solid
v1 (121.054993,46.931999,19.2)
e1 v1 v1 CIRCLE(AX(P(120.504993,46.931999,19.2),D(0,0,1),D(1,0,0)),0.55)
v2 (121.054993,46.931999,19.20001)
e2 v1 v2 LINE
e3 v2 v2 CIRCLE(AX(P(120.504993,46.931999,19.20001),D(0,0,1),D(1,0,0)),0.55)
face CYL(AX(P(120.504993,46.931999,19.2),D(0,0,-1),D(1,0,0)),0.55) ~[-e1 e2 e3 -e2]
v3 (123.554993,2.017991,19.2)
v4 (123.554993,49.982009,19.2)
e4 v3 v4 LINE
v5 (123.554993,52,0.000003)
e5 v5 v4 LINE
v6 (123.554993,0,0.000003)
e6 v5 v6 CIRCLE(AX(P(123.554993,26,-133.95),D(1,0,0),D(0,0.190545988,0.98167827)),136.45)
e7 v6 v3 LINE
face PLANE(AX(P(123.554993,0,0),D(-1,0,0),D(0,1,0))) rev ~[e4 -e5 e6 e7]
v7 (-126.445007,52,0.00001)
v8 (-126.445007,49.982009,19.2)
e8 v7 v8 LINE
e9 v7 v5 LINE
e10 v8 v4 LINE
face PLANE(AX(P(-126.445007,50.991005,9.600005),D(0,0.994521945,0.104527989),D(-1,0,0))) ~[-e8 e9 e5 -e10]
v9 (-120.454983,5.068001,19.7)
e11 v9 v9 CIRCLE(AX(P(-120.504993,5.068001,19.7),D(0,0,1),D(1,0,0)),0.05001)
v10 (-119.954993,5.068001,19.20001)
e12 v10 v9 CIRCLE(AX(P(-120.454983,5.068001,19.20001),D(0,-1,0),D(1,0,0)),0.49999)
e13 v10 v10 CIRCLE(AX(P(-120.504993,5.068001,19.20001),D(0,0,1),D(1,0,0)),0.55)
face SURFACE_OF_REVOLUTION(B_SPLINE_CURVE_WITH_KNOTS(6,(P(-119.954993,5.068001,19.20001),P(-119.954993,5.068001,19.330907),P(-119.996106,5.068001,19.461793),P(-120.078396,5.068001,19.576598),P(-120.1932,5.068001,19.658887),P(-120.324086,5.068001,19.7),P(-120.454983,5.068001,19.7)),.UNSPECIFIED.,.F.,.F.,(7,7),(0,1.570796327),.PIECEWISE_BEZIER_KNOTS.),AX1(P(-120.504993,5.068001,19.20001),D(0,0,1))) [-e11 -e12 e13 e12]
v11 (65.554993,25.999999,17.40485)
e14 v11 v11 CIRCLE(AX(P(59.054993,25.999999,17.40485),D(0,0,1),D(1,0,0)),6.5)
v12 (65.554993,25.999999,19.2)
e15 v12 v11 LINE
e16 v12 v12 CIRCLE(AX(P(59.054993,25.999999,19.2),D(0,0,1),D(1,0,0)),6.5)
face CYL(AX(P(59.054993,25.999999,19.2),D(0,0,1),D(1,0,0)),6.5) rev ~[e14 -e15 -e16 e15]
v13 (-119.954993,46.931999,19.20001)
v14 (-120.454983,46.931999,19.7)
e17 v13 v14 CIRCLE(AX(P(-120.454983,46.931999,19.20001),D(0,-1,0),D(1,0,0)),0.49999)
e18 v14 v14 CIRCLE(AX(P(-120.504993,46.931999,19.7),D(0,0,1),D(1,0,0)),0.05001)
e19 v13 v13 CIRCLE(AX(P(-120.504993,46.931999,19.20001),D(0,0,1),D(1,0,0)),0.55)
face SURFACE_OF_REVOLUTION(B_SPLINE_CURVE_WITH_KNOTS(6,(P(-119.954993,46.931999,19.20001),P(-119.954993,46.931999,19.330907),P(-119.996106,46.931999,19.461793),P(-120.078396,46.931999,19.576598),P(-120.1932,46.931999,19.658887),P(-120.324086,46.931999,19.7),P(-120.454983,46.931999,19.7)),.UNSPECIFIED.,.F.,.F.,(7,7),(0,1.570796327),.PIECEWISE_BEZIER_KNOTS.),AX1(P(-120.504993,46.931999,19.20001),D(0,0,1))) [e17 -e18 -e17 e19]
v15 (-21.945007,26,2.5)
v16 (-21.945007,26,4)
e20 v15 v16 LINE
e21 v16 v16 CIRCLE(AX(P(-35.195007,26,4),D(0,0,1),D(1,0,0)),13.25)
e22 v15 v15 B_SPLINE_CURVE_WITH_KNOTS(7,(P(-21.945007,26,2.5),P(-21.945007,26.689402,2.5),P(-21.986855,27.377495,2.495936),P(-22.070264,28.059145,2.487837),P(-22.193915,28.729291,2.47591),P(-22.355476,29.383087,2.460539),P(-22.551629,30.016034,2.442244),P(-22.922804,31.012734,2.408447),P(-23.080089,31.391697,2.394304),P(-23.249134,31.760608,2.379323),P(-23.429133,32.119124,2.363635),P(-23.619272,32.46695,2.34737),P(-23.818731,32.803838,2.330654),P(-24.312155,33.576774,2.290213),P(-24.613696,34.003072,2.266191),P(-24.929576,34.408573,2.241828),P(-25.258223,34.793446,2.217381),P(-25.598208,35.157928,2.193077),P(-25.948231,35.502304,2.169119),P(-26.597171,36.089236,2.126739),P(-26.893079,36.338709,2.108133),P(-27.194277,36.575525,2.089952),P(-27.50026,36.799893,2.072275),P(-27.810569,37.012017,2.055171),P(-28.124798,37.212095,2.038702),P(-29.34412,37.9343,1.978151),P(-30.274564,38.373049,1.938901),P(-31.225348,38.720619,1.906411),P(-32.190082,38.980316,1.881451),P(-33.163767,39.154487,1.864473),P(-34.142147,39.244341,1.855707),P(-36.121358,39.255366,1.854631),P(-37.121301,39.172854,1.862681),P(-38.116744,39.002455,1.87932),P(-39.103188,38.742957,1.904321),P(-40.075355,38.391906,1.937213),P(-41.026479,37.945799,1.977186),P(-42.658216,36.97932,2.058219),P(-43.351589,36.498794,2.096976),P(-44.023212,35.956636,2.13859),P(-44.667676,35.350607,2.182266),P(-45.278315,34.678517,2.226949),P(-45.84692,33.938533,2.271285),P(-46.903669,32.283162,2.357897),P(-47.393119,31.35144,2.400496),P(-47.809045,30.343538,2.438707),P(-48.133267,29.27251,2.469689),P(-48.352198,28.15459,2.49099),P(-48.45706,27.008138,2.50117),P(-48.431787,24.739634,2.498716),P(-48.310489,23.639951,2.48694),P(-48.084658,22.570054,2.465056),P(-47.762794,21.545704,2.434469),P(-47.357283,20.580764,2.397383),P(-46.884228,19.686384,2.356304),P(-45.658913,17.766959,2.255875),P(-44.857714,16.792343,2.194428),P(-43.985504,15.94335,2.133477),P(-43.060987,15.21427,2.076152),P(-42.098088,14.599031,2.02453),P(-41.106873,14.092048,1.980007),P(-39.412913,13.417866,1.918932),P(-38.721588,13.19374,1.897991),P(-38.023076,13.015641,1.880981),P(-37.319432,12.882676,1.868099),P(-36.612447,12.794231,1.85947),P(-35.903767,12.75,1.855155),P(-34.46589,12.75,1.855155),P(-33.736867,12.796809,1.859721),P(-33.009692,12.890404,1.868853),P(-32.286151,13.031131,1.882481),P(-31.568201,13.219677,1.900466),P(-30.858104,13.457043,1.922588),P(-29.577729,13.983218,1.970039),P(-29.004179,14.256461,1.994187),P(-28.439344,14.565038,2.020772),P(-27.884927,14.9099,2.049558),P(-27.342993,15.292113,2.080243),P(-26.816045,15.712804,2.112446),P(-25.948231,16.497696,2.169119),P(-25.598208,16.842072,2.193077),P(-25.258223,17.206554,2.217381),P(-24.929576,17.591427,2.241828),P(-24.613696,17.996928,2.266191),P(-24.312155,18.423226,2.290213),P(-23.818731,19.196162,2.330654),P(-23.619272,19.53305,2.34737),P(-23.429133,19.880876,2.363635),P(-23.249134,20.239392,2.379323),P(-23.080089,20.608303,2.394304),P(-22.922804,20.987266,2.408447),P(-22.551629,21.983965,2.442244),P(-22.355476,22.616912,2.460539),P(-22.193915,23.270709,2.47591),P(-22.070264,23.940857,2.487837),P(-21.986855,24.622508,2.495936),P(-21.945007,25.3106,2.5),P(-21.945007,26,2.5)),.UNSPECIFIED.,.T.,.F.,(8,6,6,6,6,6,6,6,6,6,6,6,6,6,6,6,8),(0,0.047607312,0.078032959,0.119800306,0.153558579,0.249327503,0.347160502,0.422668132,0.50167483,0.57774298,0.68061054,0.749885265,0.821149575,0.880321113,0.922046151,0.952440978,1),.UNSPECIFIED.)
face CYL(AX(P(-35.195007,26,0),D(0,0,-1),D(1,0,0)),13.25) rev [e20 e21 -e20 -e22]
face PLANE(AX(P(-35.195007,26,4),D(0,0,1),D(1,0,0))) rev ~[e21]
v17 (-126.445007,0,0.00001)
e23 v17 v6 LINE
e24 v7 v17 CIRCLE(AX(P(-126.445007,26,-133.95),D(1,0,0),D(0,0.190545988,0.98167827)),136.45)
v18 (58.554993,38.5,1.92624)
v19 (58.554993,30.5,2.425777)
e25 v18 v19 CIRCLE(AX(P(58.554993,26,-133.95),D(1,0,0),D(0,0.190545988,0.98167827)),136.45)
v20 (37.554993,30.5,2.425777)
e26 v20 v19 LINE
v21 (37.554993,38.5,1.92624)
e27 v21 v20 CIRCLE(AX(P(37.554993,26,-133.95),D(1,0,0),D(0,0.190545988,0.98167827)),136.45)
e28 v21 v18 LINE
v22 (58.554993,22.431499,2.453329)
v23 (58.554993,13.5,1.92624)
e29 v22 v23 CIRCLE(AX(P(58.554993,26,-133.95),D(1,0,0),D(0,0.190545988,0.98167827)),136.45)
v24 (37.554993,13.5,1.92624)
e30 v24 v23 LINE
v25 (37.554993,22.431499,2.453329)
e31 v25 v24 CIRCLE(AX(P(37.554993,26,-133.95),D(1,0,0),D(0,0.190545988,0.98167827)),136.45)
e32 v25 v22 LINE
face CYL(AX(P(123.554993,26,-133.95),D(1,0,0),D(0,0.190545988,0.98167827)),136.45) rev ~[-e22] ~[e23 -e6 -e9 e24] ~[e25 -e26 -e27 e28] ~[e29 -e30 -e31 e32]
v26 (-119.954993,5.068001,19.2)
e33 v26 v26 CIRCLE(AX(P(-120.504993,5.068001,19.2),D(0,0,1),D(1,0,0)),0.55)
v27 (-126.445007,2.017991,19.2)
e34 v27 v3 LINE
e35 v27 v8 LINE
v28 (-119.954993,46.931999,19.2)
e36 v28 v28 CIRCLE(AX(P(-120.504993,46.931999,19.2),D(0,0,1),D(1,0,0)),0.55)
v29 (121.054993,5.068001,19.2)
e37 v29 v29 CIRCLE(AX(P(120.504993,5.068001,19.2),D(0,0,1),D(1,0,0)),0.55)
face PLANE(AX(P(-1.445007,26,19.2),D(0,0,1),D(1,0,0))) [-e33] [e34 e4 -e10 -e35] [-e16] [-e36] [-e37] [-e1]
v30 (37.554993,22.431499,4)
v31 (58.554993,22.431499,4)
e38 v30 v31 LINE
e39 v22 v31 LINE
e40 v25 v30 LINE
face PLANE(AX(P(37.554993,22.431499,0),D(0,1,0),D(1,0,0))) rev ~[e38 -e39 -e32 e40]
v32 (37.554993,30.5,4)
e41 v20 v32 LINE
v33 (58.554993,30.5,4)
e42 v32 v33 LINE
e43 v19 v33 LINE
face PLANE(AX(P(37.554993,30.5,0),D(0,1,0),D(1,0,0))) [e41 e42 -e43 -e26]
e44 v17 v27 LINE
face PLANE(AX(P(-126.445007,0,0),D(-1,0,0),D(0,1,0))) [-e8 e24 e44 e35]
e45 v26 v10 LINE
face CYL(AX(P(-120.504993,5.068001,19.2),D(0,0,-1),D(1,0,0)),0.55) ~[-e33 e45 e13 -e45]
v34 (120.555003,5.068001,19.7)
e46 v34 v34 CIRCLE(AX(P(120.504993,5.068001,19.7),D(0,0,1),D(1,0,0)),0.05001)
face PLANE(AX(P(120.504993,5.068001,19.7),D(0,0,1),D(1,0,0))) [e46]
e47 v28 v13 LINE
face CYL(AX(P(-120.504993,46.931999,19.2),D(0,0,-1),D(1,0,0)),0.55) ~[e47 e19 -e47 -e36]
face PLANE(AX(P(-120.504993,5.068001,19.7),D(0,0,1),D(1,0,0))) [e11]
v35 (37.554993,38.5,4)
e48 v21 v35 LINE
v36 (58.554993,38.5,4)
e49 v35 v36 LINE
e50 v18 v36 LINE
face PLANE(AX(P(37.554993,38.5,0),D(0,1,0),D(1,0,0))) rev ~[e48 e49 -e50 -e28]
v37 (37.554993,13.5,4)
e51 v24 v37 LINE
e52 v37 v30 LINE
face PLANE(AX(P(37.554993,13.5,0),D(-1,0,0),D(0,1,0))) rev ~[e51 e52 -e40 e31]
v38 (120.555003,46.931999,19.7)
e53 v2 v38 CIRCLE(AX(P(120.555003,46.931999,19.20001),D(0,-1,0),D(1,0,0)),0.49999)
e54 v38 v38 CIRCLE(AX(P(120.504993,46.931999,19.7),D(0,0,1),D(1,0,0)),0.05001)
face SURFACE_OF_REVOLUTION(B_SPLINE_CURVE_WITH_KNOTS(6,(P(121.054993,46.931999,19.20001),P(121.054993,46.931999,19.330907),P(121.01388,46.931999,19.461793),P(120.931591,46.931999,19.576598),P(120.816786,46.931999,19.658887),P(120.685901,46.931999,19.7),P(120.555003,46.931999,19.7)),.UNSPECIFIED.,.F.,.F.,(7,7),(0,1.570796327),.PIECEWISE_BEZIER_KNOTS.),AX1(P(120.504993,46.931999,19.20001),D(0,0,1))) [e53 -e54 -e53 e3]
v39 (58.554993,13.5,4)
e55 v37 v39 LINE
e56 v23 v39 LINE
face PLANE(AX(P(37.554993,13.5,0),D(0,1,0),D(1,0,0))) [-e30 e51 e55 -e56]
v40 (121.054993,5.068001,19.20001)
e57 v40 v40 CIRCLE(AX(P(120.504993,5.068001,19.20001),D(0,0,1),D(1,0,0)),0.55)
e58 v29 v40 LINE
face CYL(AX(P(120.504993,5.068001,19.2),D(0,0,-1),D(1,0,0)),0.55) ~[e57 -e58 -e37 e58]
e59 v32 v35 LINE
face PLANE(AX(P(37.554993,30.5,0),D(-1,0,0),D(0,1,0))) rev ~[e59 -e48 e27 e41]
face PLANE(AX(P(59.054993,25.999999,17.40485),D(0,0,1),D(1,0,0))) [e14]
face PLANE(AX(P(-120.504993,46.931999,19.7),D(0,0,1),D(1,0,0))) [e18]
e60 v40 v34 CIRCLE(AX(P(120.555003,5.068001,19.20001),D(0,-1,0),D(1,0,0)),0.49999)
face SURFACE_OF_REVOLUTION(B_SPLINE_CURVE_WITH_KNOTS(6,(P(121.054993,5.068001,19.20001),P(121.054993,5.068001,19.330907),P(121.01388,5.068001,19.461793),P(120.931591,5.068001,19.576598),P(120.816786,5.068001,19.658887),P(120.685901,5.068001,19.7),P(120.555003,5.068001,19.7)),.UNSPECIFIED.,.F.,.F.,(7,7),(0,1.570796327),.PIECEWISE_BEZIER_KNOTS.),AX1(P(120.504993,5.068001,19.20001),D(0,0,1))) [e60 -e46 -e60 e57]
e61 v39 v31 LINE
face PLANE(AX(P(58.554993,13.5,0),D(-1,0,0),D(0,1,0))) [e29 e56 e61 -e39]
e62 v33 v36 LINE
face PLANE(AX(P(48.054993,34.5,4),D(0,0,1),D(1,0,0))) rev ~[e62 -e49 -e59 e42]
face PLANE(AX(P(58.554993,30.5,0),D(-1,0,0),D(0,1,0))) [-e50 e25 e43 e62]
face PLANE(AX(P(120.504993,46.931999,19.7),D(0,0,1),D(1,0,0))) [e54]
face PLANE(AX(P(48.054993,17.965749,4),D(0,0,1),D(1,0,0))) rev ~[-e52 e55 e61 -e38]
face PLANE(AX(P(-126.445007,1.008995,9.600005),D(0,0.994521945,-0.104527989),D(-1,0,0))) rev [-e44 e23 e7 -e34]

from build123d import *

# Parameters (mm, degrees)
F0_W          = 250
F0_H          = 52
F1_DEPTH      = 19.2
F2_SIZE2      = 2.017991
F2_SIZE       = 19.19999
F3_SIZE2      = 2.017991
F3_SIZE       = 19.19999
F4_R          = 6.5
F5_DEPTH      = 1.7951503396
F7_DEPTH      = 58.4841370583
F7_DEPTH_BACK = 301.5629071742
F8_R          = 0.55
F9_DEPTH      = 0.5
F10_R         = 0.49999
F11_R         = 0.49999
F12_R         = 13.25
F13_DEPTH     = 4
F14_W         = 21
F14_H         = 8
F14_H_2       = 8.9314985695
F15_DEPTH     = 4


# Not quite as in the source:
# - a fillet or chamfer is up to 0.001 mm smaller than in the source, because OpenCascade refuses the exact size


with BuildPart() as f1:
    # F0 (on Top) → F1 (new body)
    with BuildSketch(Plane.XY):
        with Locations((-1.4450065748, 26)):
            Rectangle(F0_W, F0_H)
    extrude(amount=F1_DEPTH)

    # F2 (size 19.2 and 2.0180013171 in the source; OpenCascade refuses exactly that, so slightly less here)
    f2_edges = [f1.edges().sort_by_distance(p)[0] for p in [
        (-1.445007, 52, 19.2),
    ]]
    f2_side = f1.faces().sort_by_distance((-1.445007, 52, 9.6))[0]
    chamfer(f2_edges, length=F2_SIZE, length2=F2_SIZE2, reference=f2_side)

    # F3 (size 19.2 and 2.0180013171 in the source; OpenCascade refuses exactly that, so slightly less here)
    f3_edges = [f1.edges().sort_by_distance(p)[0] for p in [
        (-1.445007, 0, 19.2),
    ]]
    f3_side = f1.faces().sort_by_distance((-1.445007, 0, 9.6))[0]
    chamfer(f3_edges, length=F3_SIZE, length2=F3_SIZE2, reference=f3_side)

    # F4 (on face) → F5 (cut)
    with BuildSketch(Plane.XY.offset(19.2)):
        with Locations((59.0549934252, 25.9999986829)):
            Circle(F4_R)
    extrude(amount=-F5_DEPTH, mode=Mode.SUBTRACT)

    # F6 (on face) → F7 (cut, two sides)
    with BuildSketch(Plane.YZ.offset(123.5549934252)) as f7_sk:
        Polygon((56.2664195895, -9.8316892982), (52, 0), (0, 0), (-4.1076340713, -9.8316892982), align=None)
        with BuildLine():
            Line((0, 0), (52, 0))
            ThreePointArc((52, 0), (26, 2.5), (0, 0))
        make_face()
    extrude(amount=F7_DEPTH, mode=Mode.SUBTRACT)
    extrude(f7_sk.sketch, amount=-F7_DEPTH_BACK, mode=Mode.SUBTRACT)

    # F8 (on face) → F9 (join)
    with BuildSketch(Plane.XY.offset(19.2)):
        with Locations((120.5049934252, 5.0680013171)):
            Circle(F8_R)
        with Locations((120.5049934252, 46.9319986829)):
            Circle(F8_R)
        with Locations((-120.5049934252, 5.0680013171)):
            Circle(F8_R)
        with Locations((-120.5049934252, 46.9319986829)):
            Circle(F8_R)
    extrude(amount=F9_DEPTH)

    # F10 (radius 0.5 in the source; OpenCascade refuses exactly that, so slightly less here)
    f10_edges = [f1.edges().sort_by_distance(p)[0] for p in [
        (119.954993, 5.068001, 19.7),
    ]]
    fillet(f10_edges, radius=F10_R)

    # F11 (radius 0.5 in the source; OpenCascade refuses exactly that, so slightly less here)
    f11_edges = [f1.edges().sort_by_distance(p)[0] for p in [
        (-121.054993, 5.068001, 19.7),
        (119.954993, 46.931999, 19.7),
        (-121.054993, 46.931999, 19.7),
    ]]
    fillet(f11_edges, radius=F11_R)

    # F12 (on Top) → F13 (cut)
    with BuildSketch(Plane.XY):
        with Locations((-35.1950065748, 26)):
            Circle(F12_R)
    extrude(amount=F13_DEPTH, mode=Mode.SUBTRACT)

    # F14 (on Top) → F15 (cut)
    with BuildSketch(Plane.XY):
        with Locations((48.0549934252, 34.5)):
            Rectangle(F14_W, F14_H)
        with Locations((48.0549934252, 17.9657492848)):
            Rectangle(F14_W, F14_H_2)
    extrude(amount=F15_DEPTH, mode=Mode.SUBTRACT)


solid = f1.part
